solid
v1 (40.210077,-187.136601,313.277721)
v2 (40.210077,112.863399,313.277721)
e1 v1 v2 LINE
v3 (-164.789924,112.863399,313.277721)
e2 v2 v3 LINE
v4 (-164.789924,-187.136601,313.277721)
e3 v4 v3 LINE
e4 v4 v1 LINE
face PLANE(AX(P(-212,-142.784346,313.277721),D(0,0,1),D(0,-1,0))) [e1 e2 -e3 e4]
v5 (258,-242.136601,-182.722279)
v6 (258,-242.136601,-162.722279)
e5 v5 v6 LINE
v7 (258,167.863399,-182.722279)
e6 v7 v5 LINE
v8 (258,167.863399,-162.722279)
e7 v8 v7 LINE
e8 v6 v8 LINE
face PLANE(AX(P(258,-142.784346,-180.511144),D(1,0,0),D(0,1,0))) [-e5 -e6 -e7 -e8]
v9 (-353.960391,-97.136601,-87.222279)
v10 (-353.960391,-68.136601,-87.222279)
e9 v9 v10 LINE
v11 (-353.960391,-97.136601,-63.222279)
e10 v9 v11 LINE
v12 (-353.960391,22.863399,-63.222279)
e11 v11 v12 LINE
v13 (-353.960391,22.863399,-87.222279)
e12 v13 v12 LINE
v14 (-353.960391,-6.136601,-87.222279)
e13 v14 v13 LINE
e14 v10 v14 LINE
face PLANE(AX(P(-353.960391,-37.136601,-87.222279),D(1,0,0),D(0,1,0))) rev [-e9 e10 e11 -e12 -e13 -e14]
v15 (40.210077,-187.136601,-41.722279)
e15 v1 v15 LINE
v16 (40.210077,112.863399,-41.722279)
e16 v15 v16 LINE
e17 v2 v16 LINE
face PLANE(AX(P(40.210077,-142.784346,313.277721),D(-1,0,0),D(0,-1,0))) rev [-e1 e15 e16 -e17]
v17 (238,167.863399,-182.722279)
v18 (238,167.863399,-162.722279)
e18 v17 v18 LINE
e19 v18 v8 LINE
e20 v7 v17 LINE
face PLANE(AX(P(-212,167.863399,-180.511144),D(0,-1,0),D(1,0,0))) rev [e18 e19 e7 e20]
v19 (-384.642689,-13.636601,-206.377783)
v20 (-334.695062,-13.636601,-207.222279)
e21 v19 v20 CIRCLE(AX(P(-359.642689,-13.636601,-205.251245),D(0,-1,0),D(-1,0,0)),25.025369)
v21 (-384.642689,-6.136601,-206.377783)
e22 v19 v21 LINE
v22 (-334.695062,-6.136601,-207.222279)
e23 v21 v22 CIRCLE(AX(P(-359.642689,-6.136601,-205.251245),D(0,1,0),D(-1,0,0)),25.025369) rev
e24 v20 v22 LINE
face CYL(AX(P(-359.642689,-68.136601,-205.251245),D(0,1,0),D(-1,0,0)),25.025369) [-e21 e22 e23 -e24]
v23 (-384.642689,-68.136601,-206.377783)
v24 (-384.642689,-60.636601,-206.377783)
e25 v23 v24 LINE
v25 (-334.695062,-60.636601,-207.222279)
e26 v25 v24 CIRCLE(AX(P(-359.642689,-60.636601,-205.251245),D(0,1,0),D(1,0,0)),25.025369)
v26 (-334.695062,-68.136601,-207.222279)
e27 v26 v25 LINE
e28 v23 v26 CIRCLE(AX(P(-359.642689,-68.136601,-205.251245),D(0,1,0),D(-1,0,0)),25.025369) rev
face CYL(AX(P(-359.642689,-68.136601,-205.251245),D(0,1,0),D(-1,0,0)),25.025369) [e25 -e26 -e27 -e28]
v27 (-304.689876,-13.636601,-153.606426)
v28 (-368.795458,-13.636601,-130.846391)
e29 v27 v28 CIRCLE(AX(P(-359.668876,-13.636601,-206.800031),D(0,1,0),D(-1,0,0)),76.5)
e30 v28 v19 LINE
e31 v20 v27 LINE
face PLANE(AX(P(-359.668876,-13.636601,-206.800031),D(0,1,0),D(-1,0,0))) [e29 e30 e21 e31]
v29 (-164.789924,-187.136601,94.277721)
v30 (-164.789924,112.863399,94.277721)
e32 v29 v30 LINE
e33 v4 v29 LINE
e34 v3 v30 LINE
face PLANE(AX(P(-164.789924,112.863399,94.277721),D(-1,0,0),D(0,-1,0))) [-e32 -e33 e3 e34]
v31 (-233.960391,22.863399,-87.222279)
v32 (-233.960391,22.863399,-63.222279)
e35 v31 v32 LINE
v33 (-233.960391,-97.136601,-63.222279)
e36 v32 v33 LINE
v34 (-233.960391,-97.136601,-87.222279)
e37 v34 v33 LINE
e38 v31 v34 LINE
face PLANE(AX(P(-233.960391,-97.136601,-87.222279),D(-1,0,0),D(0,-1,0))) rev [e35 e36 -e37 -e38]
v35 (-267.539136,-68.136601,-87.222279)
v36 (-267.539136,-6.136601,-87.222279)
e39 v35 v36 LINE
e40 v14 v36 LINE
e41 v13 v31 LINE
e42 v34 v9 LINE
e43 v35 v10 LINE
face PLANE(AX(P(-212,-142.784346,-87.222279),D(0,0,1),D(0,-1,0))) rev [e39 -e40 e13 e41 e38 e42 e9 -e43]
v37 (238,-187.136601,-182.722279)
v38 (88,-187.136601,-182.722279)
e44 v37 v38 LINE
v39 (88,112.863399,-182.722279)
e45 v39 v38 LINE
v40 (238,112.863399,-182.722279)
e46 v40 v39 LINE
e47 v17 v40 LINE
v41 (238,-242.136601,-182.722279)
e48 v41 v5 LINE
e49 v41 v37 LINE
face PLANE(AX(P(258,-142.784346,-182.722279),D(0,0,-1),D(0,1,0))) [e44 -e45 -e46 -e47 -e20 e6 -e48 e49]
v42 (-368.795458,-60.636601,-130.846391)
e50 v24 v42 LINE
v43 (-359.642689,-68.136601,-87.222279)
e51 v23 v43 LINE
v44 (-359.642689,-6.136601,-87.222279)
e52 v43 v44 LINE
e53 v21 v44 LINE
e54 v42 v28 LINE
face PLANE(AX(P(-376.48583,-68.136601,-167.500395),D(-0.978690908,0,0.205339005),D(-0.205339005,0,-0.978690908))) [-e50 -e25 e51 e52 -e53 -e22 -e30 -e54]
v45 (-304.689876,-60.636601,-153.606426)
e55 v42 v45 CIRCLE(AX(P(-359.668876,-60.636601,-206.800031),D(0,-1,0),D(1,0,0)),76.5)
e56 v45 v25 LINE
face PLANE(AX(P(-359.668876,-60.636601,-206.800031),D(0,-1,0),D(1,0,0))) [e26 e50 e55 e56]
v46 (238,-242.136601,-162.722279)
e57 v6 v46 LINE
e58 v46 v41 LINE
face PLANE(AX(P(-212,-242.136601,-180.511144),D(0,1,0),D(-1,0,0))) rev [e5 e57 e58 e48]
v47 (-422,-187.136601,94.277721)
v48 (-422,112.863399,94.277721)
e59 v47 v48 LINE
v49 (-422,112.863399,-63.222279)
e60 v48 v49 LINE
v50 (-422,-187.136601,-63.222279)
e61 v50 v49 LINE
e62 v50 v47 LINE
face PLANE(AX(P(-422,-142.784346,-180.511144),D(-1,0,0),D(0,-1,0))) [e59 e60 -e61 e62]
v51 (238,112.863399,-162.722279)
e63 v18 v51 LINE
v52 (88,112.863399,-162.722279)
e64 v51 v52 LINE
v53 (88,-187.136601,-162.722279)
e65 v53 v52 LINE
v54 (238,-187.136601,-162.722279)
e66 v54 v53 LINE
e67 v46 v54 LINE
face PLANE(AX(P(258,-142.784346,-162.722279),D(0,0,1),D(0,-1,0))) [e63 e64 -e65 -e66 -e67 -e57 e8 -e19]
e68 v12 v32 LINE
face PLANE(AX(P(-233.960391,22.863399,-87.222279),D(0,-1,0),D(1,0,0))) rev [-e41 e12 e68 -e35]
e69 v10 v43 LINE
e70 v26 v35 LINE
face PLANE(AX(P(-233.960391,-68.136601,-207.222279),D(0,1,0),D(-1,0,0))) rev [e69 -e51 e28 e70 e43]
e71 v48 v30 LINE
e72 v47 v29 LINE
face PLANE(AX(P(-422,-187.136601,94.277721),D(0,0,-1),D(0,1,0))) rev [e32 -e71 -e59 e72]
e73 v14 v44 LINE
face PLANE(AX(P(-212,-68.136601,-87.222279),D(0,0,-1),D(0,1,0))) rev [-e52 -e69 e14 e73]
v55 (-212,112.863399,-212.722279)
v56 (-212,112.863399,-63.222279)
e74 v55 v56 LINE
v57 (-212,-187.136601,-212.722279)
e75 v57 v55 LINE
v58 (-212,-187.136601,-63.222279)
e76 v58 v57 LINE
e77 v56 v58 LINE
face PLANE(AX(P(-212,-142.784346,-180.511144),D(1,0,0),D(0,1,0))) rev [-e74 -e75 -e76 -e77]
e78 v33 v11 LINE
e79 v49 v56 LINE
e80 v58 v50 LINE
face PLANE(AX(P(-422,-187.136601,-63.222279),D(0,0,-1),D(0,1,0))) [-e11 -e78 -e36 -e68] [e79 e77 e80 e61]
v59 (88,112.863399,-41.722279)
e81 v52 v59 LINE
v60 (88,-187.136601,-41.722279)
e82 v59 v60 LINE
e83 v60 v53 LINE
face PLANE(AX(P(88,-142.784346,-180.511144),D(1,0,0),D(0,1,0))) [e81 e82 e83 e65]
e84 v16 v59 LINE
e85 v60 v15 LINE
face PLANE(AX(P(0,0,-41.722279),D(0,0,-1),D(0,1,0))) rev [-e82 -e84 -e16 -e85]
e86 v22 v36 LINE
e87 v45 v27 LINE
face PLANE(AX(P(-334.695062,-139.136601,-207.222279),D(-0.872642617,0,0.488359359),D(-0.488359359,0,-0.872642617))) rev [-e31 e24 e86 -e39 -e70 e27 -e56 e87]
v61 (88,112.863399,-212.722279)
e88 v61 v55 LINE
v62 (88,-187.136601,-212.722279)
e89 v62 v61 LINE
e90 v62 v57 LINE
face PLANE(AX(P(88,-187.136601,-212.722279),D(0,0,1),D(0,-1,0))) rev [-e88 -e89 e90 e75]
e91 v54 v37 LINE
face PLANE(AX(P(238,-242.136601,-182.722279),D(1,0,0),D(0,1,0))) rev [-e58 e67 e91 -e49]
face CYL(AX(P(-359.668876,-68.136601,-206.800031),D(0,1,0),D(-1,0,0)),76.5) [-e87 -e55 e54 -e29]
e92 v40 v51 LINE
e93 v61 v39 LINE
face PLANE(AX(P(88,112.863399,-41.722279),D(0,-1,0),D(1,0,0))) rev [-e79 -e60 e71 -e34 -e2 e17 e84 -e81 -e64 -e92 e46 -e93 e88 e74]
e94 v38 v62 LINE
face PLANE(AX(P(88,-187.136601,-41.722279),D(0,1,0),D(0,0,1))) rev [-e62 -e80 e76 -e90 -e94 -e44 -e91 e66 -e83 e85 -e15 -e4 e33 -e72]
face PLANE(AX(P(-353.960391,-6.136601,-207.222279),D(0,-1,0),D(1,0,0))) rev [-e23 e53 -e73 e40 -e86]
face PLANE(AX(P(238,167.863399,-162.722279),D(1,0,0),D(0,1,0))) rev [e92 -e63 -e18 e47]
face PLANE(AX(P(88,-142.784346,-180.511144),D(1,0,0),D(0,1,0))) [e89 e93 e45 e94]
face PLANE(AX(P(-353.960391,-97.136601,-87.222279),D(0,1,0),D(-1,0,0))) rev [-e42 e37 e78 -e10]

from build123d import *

# Parameters (mm, degrees)
SKETCH_1_W                     = 300
SKETCH_1_H                     = 171
EXTRUDE_1_DEPTH                = 300
SKETCH_2_W                     = 205.00000064
SKETCH_2_H                     = 300
EXTRUDE_2_DEPTH                = 355
SKETCH_3_W                     = 300
SKETCH_3_H                     = 136
EXTRUDE_3_DEPTH                = 257.21007636
EXTRUDE_4_DEPTH                = 24
EXTRUDE_5_DEPTH                = 120
EXTRUDE_7_DEPTH                = 62
CUT_EXTRUDE_3_DEPTH            = 133
EXTRUDE_9_DEPTH                = 62
CUT_EXTRUDE_4_DEPTH            = 7.5
CUT_EXTRUDE_START              = -7.5
CUT_EXTRUDE_5_DEPTH            = 7.5
SKETCH_13_W                    = 300
SKETCH_13_H                    = 20
EXTRUDE_10_DEPTH               = 170
SKETCH_14_W                    = 20
SKETCH_14_H                    = 20
EXTRUDE_11_DEPTH               = 55
SKETCH_15_W                    = 20
SKETCH_15_H                    = 20
EXTRUDE_13_DEPTH               = 55
MOVE_BODY_2_ANGLE              = 90
SPLIT_START                    = -187.136600778
SPLIT_BODIES_1_DEPTH           = 300
SPLIT_START_2                  = -242.136600778
SPLIT_BODIES_1_2_OUTLINE_W     = 20
SPLIT_BODIES_1_2_OUTLINE_H     = 20
SPLIT_BODIES_1_2_DEPTH         = 410
SPLIT_START_3                  = -212.722279175
SPLIT_BODIES_1_3_DEPTH         = 171
SPLIT_START_4                  = -68.136600778
SPLIT_BODIES_1_4_DEPTH         = 62
SPLIT_START_5                  = -97.136600778
SPLIT_BODIES_1_5_OUTLINE_W     = 120
SPLIT_BODIES_1_5_OUTLINE_H     = 24
SPLIT_BODIES_1_5_DEPTH         = 120
SKETCH_16_W                    = 210
SKETCH_16_H                    = 300
EXTRUDE_14_DEPTH               = 21.5
SPLIT_START_6                  = -63.222279175
SPLIT_BODIES_4_OUTLINE_W       = 257.21007636
SPLIT_BODIES_4_OUTLINE_H       = 300
SPLIT_BODIES_4_DEPTH           = 157.5
SPLIT_BODIES_4_2_OUTLINE_W     = 47.21007636
SPLIT_BODIES_4_2_OUTLINE_H     = 300
SPLIT_BODIES_4_2_DEPTH         = 149.5
SPLIT_BODIES_4_3_OUTLINE_W     = 257.21007636
SPLIT_BODIES_4_3_OUTLINE_H     = 300
SPLIT_BODIES_4_3_DEPTH         = 157.5
SPLIT_BODIES_4_4_OUTLINE_W     = 47.21007636
SPLIT_BODIES_4_4_OUTLINE_H     = 300
SPLIT_BODIES_4_4_DEPTH         = 149.5
SPLIT_BODIES_7_SURFACE_1_BACK  = 1003.933
SPLIT_BODIES_7_SURFACE_1_DEPTH = 2007.866
SPLIT_BODIES_7_SURFACE_2_BACK  = 1003.933
SPLIT_BODIES_7_SURFACE_2_DEPTH = 2007.866


# Read off the part's stored shape, not the designer's step: 部品分割1, 部品分割3, 部品分割4
with BuildPart() as part:
    # ｽｹｯﾁ1 → ﾎﾞｽ - 押し出し1 (new body)
    with BuildSketch(Plane(origin=(0, 0, 0), x_dir=(0, 0, -1), z_dir=(1, 0, 0))):
        with Locations((105.647745135, 53.288865182)):
            Rectangle(SKETCH_1_W, SKETCH_1_H)
    extrude(amount=EXTRUDE_1_DEPTH)

    # ｽｹｯﾁ2 → ﾎﾞｽ - 押し出し2 (add)
    with BuildSketch(Plane(origin=(0, 138.788865182, 0), x_dir=(1, 0, 0), z_dir=(0, 1, 0))):
        with Locations((149.71007668, 105.647745135)):
            Rectangle(SKETCH_2_W, SKETCH_2_H)
    extrude(amount=EXTRUDE_2_DEPTH)

    # ｽｹｯﾁ3 → ﾎﾞｽ - 押し出し3 (add)
    with BuildSketch(Plane.ZY.offset(-47.21007636)):
        with Locations((-105.647745135, 206.788865182)):
            Rectangle(SKETCH_3_W, SKETCH_3_H)
    extrude(amount=EXTRUDE_3_DEPTH)

    # ｽｹｯﾁ4 → ﾎﾞｽ - 押し出し4 (add)
    with BuildSketch(Plane.XZ.offset(-138.788865182)):
        Polygon((-141.96039145, -105.647745135), (-141.96039145, -45.647745135), (-21.96039145, -45.647745135), (-21.96039145, -165.647745135), (-141.96039145, -165.647745135), align=None)
    extrude(amount=EXTRUDE_4_DEPTH)

    # ｽｹｯﾁ5 → ﾎﾞｽ - 押し出し5 (add)
    with BuildSketch(Plane.XZ.offset(-114.788865182)):
        Polygon((-141.96039145, -105.647745135), (-141.96039145, -136.647745135), (-21.96039145, -136.647745135), (-21.96039145, -74.647745135), (-141.96039145, -74.647745135), align=None)
    extrude(amount=EXTRUDE_5_DEPTH)

    # ｽｹｯﾁ6 → ﾎﾞｽ - 押し出し7 (add)
    with BuildSketch(Plane(origin=(0, 0, -136.647745135), x_dir=(-1, 0, 0), z_dir=(0, 0, -1))):
        Polygon((141.96039145, 114.788865182), (81.96039145, 114.788865182), (122.64268945, -4.366639057), (147.64268945, -4.366639057), (147.64268945, 114.788865182), align=None)
        with BuildLine():
            Line((147.64268945, -4.366639057), (122.64268945, -4.366639057))
            ThreePointArc((122.64268945, -4.366639057), (147.64268945, -28.265469922), (172.64268945, -4.366639057))
            Line((172.64268945, -4.366639057), (147.64268945, -4.366639057))
        make_face()
        Polygon((172.64268945, -4.366639057), (147.64268945, 114.788865182), (147.64268945, -4.366639057), align=None)
    extrude(amount=-EXTRUDE_7_DEPTH)

    # ｽｹｯﾁ8 → ｶｯﾄ - 押し出し3 (cut)
    with BuildSketch(Plane(origin=(0, 0, -136.647745135), x_dir=(-1, 0, 0), z_dir=(0, 0, -1))):
        Polygon((122.695062033, -5.211134818), (55.539135991, 114.788865182), (21.96039145, 114.788865182), (21.96039145, -5.211134818), align=None)
    extrude(amount=-CUT_EXTRUDE_3_DEPTH, mode=Mode.SUBTRACT)

    # ｽｹｯﾁ13 → ﾎﾞｽ - 押し出し10 (add)
    with BuildSketch(Plane(origin=(300, 0, 0), x_dir=(0, 0, -1), z_dir=(1, 0, 0))):
        with Locations((105.647745135, 7.788865182)):
            Rectangle(SKETCH_13_W, SKETCH_13_H)
    extrude(amount=EXTRUDE_10_DEPTH)

    # ｽｹｯﾁ14 → ﾎﾞｽ - 押し出し11 (add)
    with BuildSketch(Plane.XY.offset(44.352254865)):
        with Locations((460, 7.788865182)):
            Rectangle(SKETCH_14_W, SKETCH_14_H)
    extrude(amount=EXTRUDE_11_DEPTH)

    # ｽｹｯﾁ15 → ﾎﾞｽ - 押し出し13 (add)
    with BuildSketch(Plane(origin=(0, 0, -255.647745135), x_dir=(-1, 0, 0), z_dir=(0, 0, -1))):
        with Locations((-460, 7.788865182)):
            Rectangle(SKETCH_15_W, SKETCH_15_H)
    extrude(amount=EXTRUDE_13_DEPTH)


with BuildPart() as body_2:
    # ｽｹｯﾁ9 → ﾎﾞｽ - 押し出し9 (new body)
    with BuildSketch(Plane(origin=(0, 0, -136.647745135), x_dir=(-1, 0, 0), z_dir=(0, 0, -1))):
        with BuildLine():
            ThreePointArc((172.64268945, -4.366639057), (148.065748541, -28.261893715), (122.695062033, -5.211134818))
            Line((122.695062033, -5.211134818), (92.689876472, 48.40471831))
            ThreePointArc((92.689876472, 48.40471831), (118.977792145, -75.704835229), (224.168875741, -4.788886938))
            ThreePointArc((224.168875741, -4.788886938), (204.898385478, 45.975600801), (156.795458346, 71.164753462))
            Line((156.795458346, 71.164753462), (172.64268945, -4.366639057))
        make_face()
    extrude(amount=-EXTRUDE_9_DEPTH)

    # ｽｹｯﾁ11 → ｶｯﾄ - 押し出し4 (cut)
    with BuildSketch(Plane(origin=(0, 0, -136.647745135), x_dir=(-1, 0, 0), z_dir=(0, 0, -1))):
        with BuildLine():
            Line((156.795458346, 71.164753462), (172.64268945, -4.366639057))
            ThreePointArc((172.64268945, -4.366639057), (148.065748541, -28.261893715), (122.695062033, -5.211134818))
            Line((122.695062033, -5.211134818), (92.689876472, 48.40471831))
            ThreePointArc((92.689876472, 48.40471831), (173.264106323, -76.880038763), (156.795458346, 71.164753462))
        make_face()
    extrude(amount=-CUT_EXTRUDE_4_DEPTH, mode=Mode.SUBTRACT)

    # ｽｹｯﾁ12 → ｶｯﾄ - 押し出し5 (cut)
    with BuildSketch(Plane.XY.offset(-74.647745135).offset(CUT_EXTRUDE_START)):
        with BuildLine():
            Line((-156.795458346, 71.164753462), (-172.64268945, -4.366639057))
            ThreePointArc((-172.64268945, -4.366639057), (-148.065748541, -28.261893715), (-122.695062033, -5.211134818))
            Line((-122.695062033, -5.211134818), (-92.689876472, 48.40471831))
            ThreePointArc((-92.689876472, 48.40471831), (-173.264106323, -76.880038763), (-156.795458346, 71.164753462))
        make_face()
    extrude(amount=CUT_EXTRUDE_5_DEPTH, mode=Mode.SUBTRACT)


with BuildPart() as part_1:
    # Move Body 2: moved
    add(part.part.rotate(Axis((0, 112.863399222, -105.647745135), (1, 0, 0)), MOVE_BODY_2_ANGLE))


with BuildPart() as body_2_1:
    # Move Body 2: moved
    add(body_2.part.rotate(Axis((0, 112.863399222, -105.647745135), (1, 0, 0)), MOVE_BODY_2_ANGLE))


with BuildPart() as part_2:
    # Move Body 3: moved
    add(part_1.part.moved(Location((-212, -150, 38))))

    # Split Bodies 1 3 outline → Split Bodies 1 3 (cut)
    with BuildSketch(Plane.XY.offset(SPLIT_START_3)):
        Polygon((-212, 112.863399222), (-212, -187.136600778), (238, -187.136600778), (238, -242.136600778), (258, -242.136600778), (258, 167.863399222), (238, 167.863399222), (238, 112.863399222), align=None)
        Polygon((-386, -6.136600778), (-386, -68.136600778), (-353.96039145, -68.136600778), (-353.96039145, -97.136600778), (-233.96039145, -97.136600778), (-233.96039145, 22.863399222), (-353.96039145, 22.863399222), (-353.96039145, -6.136600778), align=None)
    extrude(amount=SPLIT_BODIES_1_3_DEPTH, mode=Mode.SUBTRACT)


with BuildPart() as body_2_2:
    # Move Body 3: moved
    add(body_2_1.part.moved(Location((-212, -150, 38))))


with BuildPart() as body_3:
    # Split Bodies 1 outline → Split Bodies 1 (new body)
    with BuildSketch(Plane(origin=(0, 0, 0), x_dir=(1, 0, 0), z_dir=(0, 1.0, 1.1906985813992e-12)).offset(SPLIT_START)):
        Polygon((-212, 41.722279175), (88, 41.722279175), (88, 162.722279175), (258, 162.722279175), (258, 182.722279175), (88, 182.722279175), (88, 212.722279175), (-212, 212.722279175), align=None)
    extrude(amount=SPLIT_BODIES_1_DEPTH)

    # Split Bodies 1 2 outline → Split Bodies 1 2 (add)
    with BuildSketch(Plane(origin=(0, 0, 0), x_dir=(1, 0, 0), z_dir=(0, 1.0, 1.1906985813992e-12)).offset(SPLIT_START_2)):
        with Locations((248, 172.722279175)):
            Rectangle(SPLIT_BODIES_1_2_OUTLINE_W, SPLIT_BODIES_1_2_OUTLINE_H)
    extrude(amount=SPLIT_BODIES_1_2_DEPTH)


with BuildPart() as body_4:
    # Split Bodies 1 4 outline → Split Bodies 1 4 (new body)
    with BuildSketch(Plane(origin=(0, 0, 0), x_dir=(1, 0, 0), z_dir=(0, 1.0, 1.1906985813992e-12)).offset(SPLIT_START_4)):
        with BuildLine():
            Line((-233.96039145, 41.722279175), (-233.96039145, 65.722279175))
            Line((-233.96039145, 65.722279175), (-267.539135991, 65.722279175))
            Line((-267.539135991, 65.722279175), (-334.695062033, 185.722279175))
            ThreePointArc((-334.695062033, 185.722279175), (-360.065748541, 208.773038071), (-384.64268945, 184.877783414))
            Line((-384.64268945, 184.877783414), (-359.64268945, 65.722279175))
            Line((-359.64268945, 65.722279175), (-353.96039145, 65.722279175))
            Line((-353.96039145, 65.722279175), (-353.96039145, 41.722279175))
            Line((-353.96039145, 41.722279175), (-233.96039145, 41.722279175))
        make_face()
    extrude(amount=SPLIT_BODIES_1_4_DEPTH)

    # Split Bodies 1 5 outline → Split Bodies 1 5 (add)
    with BuildSketch(Plane(origin=(0, 0, 0), x_dir=(1, 0, 0), z_dir=(0, 1.0, 1.1906985813992e-12)).offset(SPLIT_START_5)):
        with Locations((-293.96039145, 53.722279175)):
            Rectangle(SPLIT_BODIES_1_5_OUTLINE_W, SPLIT_BODIES_1_5_OUTLINE_H)
    extrude(amount=SPLIT_BODIES_1_5_DEPTH)


with BuildPart() as body_4_1:
    # Move Body 4: moved
    add(body_4.part.moved(Location((0, 0, -21.5))))


with BuildPart() as body_2_3:
    # Move Body 4: moved
    add(body_2_2.part.moved(Location((0, 0, -21.5))))


with BuildPart() as body_5:
    # ｽｹｯﾁ16 → ﾎﾞｽ - 押し出し14 (new body)
    with BuildSketch(Plane(origin=(0, 0, -41.722279175), x_dir=(-1, 0, 0), z_dir=(0, 1.1906985813991966e-12, -1.0))):
        with Locations((317, -37.136600778)):
            Rectangle(SKETCH_16_W, SKETCH_16_H)
    extrude(amount=EXTRUDE_14_DEPTH)


with BuildPart() as part_3:
    add(part_2.part)

    # Combine 1: union body 5, body 3, body 4, body 2
    add(body_5.part)
    add(body_3.part)
    add(body_4_1.part)
    add(body_2_3.part)


with BuildPart() as body_2_2_1:
    # Split Bodies 3: the piece on the far side of the plane
    add(part_3.part)
    split(bisect_by=Plane.YZ.offset(-164.78992364), keep=Keep.BOTTOM)

    # Split Bodies 4 outline → Split Bodies 4 (cut)
    with BuildSketch(Plane.XY.offset(SPLIT_START_6)):
        with Locations((-293.39496182, -37.136600778)):
            Rectangle(SPLIT_BODIES_4_OUTLINE_W, SPLIT_BODIES_4_OUTLINE_H)
    extrude(amount=SPLIT_BODIES_4_DEPTH, mode=Mode.SUBTRACT)

    # Split Bodies 4 2 outline → Split Bodies 4 2 (cut)
    with BuildSketch(Plane.XY.offset(SPLIT_START_3)):
        with Locations((-188.39496182, -37.136600778)):
            Rectangle(SPLIT_BODIES_4_2_OUTLINE_W, SPLIT_BODIES_4_2_OUTLINE_H)
    extrude(amount=SPLIT_BODIES_4_2_DEPTH, mode=Mode.SUBTRACT)


with BuildPart() as part_4:
    add(part_3.part)

    # Split Bodies 3
    split(bisect_by=Plane.YZ.offset(-164.78992364), keep=Keep.TOP)


with BuildPart() as body_3_2:
    # Split Bodies 4 3 outline → Split Bodies 4 3 (new body)
    with BuildSketch(Plane.XY.offset(SPLIT_START_6)):
        with Locations((-293.39496182, -37.136600778)):
            Rectangle(SPLIT_BODIES_4_3_OUTLINE_W, SPLIT_BODIES_4_3_OUTLINE_H)
    extrude(amount=SPLIT_BODIES_4_3_DEPTH)

    # Split Bodies 4 4 outline → Split Bodies 4 4 (add)
    with BuildSketch(Plane.XY.offset(SPLIT_START_3)):
        with Locations((-188.39496182, -37.136600778)):
            Rectangle(SPLIT_BODIES_4_4_OUTLINE_W, SPLIT_BODIES_4_4_OUTLINE_H)
    extrude(amount=SPLIT_BODIES_4_4_DEPTH)


with BuildPart() as body_4_2:
    # Split Bodies 7: the piece behind the surface
    add(part_4.part)
    # Split Bodies 7 surface: a surface, the sketch's curves swept straight by 2007.866 mm
    with BuildLine(Plane.XY.offset(313.277720825).offset(-SPLIT_BODIES_7_SURFACE_1_BACK), mode=Mode.PRIVATE) as split_bodies_7_surface_1_path:
        Line((-60.73235277, -188.487666989), (-60.73235277, 112.863399222))
    split_bodies_7_surface_1 = Shell.extrude(split_bodies_7_surface_1_path.wire(), (0 * SPLIT_BODIES_7_SURFACE_1_DEPTH, 0 * SPLIT_BODIES_7_SURFACE_1_DEPTH, 1 * SPLIT_BODIES_7_SURFACE_1_DEPTH))
    split(bisect_by=split_bodies_7_surface_1, keep=Keep.BOTTOM)


with BuildPart() as part_5:
    add(part_4.part)

    # Split Bodies 7: split by a surface, the side it looks to stays
    # Split Bodies 7 surface: a surface, the sketch's curves swept straight by 2007.866 mm
    with BuildLine(Plane.XY.offset(313.277720825).offset(-SPLIT_BODIES_7_SURFACE_2_BACK), mode=Mode.PRIVATE) as split_bodies_7_surface_2_path:
        Line((-60.73235277, -188.487666989), (-60.73235277, 112.863399222))
    split_bodies_7_surface_2 = Shell.extrude(split_bodies_7_surface_2_path.wire(), (0 * SPLIT_BODIES_7_SURFACE_2_DEPTH, 0 * SPLIT_BODIES_7_SURFACE_2_DEPTH, 1 * SPLIT_BODIES_7_SURFACE_2_DEPTH))
    split(bisect_by=split_bodies_7_surface_2, keep=Keep.TOP)


with BuildPart() as body_3_2_1:
    add(body_3_2.part)

    # Combine 2: union body 2 2, part, body 4 2
    add(body_2_2_1.part)
    add(part_5.part)
    add(body_4_2.part)


solid = body_3_2_1.part
